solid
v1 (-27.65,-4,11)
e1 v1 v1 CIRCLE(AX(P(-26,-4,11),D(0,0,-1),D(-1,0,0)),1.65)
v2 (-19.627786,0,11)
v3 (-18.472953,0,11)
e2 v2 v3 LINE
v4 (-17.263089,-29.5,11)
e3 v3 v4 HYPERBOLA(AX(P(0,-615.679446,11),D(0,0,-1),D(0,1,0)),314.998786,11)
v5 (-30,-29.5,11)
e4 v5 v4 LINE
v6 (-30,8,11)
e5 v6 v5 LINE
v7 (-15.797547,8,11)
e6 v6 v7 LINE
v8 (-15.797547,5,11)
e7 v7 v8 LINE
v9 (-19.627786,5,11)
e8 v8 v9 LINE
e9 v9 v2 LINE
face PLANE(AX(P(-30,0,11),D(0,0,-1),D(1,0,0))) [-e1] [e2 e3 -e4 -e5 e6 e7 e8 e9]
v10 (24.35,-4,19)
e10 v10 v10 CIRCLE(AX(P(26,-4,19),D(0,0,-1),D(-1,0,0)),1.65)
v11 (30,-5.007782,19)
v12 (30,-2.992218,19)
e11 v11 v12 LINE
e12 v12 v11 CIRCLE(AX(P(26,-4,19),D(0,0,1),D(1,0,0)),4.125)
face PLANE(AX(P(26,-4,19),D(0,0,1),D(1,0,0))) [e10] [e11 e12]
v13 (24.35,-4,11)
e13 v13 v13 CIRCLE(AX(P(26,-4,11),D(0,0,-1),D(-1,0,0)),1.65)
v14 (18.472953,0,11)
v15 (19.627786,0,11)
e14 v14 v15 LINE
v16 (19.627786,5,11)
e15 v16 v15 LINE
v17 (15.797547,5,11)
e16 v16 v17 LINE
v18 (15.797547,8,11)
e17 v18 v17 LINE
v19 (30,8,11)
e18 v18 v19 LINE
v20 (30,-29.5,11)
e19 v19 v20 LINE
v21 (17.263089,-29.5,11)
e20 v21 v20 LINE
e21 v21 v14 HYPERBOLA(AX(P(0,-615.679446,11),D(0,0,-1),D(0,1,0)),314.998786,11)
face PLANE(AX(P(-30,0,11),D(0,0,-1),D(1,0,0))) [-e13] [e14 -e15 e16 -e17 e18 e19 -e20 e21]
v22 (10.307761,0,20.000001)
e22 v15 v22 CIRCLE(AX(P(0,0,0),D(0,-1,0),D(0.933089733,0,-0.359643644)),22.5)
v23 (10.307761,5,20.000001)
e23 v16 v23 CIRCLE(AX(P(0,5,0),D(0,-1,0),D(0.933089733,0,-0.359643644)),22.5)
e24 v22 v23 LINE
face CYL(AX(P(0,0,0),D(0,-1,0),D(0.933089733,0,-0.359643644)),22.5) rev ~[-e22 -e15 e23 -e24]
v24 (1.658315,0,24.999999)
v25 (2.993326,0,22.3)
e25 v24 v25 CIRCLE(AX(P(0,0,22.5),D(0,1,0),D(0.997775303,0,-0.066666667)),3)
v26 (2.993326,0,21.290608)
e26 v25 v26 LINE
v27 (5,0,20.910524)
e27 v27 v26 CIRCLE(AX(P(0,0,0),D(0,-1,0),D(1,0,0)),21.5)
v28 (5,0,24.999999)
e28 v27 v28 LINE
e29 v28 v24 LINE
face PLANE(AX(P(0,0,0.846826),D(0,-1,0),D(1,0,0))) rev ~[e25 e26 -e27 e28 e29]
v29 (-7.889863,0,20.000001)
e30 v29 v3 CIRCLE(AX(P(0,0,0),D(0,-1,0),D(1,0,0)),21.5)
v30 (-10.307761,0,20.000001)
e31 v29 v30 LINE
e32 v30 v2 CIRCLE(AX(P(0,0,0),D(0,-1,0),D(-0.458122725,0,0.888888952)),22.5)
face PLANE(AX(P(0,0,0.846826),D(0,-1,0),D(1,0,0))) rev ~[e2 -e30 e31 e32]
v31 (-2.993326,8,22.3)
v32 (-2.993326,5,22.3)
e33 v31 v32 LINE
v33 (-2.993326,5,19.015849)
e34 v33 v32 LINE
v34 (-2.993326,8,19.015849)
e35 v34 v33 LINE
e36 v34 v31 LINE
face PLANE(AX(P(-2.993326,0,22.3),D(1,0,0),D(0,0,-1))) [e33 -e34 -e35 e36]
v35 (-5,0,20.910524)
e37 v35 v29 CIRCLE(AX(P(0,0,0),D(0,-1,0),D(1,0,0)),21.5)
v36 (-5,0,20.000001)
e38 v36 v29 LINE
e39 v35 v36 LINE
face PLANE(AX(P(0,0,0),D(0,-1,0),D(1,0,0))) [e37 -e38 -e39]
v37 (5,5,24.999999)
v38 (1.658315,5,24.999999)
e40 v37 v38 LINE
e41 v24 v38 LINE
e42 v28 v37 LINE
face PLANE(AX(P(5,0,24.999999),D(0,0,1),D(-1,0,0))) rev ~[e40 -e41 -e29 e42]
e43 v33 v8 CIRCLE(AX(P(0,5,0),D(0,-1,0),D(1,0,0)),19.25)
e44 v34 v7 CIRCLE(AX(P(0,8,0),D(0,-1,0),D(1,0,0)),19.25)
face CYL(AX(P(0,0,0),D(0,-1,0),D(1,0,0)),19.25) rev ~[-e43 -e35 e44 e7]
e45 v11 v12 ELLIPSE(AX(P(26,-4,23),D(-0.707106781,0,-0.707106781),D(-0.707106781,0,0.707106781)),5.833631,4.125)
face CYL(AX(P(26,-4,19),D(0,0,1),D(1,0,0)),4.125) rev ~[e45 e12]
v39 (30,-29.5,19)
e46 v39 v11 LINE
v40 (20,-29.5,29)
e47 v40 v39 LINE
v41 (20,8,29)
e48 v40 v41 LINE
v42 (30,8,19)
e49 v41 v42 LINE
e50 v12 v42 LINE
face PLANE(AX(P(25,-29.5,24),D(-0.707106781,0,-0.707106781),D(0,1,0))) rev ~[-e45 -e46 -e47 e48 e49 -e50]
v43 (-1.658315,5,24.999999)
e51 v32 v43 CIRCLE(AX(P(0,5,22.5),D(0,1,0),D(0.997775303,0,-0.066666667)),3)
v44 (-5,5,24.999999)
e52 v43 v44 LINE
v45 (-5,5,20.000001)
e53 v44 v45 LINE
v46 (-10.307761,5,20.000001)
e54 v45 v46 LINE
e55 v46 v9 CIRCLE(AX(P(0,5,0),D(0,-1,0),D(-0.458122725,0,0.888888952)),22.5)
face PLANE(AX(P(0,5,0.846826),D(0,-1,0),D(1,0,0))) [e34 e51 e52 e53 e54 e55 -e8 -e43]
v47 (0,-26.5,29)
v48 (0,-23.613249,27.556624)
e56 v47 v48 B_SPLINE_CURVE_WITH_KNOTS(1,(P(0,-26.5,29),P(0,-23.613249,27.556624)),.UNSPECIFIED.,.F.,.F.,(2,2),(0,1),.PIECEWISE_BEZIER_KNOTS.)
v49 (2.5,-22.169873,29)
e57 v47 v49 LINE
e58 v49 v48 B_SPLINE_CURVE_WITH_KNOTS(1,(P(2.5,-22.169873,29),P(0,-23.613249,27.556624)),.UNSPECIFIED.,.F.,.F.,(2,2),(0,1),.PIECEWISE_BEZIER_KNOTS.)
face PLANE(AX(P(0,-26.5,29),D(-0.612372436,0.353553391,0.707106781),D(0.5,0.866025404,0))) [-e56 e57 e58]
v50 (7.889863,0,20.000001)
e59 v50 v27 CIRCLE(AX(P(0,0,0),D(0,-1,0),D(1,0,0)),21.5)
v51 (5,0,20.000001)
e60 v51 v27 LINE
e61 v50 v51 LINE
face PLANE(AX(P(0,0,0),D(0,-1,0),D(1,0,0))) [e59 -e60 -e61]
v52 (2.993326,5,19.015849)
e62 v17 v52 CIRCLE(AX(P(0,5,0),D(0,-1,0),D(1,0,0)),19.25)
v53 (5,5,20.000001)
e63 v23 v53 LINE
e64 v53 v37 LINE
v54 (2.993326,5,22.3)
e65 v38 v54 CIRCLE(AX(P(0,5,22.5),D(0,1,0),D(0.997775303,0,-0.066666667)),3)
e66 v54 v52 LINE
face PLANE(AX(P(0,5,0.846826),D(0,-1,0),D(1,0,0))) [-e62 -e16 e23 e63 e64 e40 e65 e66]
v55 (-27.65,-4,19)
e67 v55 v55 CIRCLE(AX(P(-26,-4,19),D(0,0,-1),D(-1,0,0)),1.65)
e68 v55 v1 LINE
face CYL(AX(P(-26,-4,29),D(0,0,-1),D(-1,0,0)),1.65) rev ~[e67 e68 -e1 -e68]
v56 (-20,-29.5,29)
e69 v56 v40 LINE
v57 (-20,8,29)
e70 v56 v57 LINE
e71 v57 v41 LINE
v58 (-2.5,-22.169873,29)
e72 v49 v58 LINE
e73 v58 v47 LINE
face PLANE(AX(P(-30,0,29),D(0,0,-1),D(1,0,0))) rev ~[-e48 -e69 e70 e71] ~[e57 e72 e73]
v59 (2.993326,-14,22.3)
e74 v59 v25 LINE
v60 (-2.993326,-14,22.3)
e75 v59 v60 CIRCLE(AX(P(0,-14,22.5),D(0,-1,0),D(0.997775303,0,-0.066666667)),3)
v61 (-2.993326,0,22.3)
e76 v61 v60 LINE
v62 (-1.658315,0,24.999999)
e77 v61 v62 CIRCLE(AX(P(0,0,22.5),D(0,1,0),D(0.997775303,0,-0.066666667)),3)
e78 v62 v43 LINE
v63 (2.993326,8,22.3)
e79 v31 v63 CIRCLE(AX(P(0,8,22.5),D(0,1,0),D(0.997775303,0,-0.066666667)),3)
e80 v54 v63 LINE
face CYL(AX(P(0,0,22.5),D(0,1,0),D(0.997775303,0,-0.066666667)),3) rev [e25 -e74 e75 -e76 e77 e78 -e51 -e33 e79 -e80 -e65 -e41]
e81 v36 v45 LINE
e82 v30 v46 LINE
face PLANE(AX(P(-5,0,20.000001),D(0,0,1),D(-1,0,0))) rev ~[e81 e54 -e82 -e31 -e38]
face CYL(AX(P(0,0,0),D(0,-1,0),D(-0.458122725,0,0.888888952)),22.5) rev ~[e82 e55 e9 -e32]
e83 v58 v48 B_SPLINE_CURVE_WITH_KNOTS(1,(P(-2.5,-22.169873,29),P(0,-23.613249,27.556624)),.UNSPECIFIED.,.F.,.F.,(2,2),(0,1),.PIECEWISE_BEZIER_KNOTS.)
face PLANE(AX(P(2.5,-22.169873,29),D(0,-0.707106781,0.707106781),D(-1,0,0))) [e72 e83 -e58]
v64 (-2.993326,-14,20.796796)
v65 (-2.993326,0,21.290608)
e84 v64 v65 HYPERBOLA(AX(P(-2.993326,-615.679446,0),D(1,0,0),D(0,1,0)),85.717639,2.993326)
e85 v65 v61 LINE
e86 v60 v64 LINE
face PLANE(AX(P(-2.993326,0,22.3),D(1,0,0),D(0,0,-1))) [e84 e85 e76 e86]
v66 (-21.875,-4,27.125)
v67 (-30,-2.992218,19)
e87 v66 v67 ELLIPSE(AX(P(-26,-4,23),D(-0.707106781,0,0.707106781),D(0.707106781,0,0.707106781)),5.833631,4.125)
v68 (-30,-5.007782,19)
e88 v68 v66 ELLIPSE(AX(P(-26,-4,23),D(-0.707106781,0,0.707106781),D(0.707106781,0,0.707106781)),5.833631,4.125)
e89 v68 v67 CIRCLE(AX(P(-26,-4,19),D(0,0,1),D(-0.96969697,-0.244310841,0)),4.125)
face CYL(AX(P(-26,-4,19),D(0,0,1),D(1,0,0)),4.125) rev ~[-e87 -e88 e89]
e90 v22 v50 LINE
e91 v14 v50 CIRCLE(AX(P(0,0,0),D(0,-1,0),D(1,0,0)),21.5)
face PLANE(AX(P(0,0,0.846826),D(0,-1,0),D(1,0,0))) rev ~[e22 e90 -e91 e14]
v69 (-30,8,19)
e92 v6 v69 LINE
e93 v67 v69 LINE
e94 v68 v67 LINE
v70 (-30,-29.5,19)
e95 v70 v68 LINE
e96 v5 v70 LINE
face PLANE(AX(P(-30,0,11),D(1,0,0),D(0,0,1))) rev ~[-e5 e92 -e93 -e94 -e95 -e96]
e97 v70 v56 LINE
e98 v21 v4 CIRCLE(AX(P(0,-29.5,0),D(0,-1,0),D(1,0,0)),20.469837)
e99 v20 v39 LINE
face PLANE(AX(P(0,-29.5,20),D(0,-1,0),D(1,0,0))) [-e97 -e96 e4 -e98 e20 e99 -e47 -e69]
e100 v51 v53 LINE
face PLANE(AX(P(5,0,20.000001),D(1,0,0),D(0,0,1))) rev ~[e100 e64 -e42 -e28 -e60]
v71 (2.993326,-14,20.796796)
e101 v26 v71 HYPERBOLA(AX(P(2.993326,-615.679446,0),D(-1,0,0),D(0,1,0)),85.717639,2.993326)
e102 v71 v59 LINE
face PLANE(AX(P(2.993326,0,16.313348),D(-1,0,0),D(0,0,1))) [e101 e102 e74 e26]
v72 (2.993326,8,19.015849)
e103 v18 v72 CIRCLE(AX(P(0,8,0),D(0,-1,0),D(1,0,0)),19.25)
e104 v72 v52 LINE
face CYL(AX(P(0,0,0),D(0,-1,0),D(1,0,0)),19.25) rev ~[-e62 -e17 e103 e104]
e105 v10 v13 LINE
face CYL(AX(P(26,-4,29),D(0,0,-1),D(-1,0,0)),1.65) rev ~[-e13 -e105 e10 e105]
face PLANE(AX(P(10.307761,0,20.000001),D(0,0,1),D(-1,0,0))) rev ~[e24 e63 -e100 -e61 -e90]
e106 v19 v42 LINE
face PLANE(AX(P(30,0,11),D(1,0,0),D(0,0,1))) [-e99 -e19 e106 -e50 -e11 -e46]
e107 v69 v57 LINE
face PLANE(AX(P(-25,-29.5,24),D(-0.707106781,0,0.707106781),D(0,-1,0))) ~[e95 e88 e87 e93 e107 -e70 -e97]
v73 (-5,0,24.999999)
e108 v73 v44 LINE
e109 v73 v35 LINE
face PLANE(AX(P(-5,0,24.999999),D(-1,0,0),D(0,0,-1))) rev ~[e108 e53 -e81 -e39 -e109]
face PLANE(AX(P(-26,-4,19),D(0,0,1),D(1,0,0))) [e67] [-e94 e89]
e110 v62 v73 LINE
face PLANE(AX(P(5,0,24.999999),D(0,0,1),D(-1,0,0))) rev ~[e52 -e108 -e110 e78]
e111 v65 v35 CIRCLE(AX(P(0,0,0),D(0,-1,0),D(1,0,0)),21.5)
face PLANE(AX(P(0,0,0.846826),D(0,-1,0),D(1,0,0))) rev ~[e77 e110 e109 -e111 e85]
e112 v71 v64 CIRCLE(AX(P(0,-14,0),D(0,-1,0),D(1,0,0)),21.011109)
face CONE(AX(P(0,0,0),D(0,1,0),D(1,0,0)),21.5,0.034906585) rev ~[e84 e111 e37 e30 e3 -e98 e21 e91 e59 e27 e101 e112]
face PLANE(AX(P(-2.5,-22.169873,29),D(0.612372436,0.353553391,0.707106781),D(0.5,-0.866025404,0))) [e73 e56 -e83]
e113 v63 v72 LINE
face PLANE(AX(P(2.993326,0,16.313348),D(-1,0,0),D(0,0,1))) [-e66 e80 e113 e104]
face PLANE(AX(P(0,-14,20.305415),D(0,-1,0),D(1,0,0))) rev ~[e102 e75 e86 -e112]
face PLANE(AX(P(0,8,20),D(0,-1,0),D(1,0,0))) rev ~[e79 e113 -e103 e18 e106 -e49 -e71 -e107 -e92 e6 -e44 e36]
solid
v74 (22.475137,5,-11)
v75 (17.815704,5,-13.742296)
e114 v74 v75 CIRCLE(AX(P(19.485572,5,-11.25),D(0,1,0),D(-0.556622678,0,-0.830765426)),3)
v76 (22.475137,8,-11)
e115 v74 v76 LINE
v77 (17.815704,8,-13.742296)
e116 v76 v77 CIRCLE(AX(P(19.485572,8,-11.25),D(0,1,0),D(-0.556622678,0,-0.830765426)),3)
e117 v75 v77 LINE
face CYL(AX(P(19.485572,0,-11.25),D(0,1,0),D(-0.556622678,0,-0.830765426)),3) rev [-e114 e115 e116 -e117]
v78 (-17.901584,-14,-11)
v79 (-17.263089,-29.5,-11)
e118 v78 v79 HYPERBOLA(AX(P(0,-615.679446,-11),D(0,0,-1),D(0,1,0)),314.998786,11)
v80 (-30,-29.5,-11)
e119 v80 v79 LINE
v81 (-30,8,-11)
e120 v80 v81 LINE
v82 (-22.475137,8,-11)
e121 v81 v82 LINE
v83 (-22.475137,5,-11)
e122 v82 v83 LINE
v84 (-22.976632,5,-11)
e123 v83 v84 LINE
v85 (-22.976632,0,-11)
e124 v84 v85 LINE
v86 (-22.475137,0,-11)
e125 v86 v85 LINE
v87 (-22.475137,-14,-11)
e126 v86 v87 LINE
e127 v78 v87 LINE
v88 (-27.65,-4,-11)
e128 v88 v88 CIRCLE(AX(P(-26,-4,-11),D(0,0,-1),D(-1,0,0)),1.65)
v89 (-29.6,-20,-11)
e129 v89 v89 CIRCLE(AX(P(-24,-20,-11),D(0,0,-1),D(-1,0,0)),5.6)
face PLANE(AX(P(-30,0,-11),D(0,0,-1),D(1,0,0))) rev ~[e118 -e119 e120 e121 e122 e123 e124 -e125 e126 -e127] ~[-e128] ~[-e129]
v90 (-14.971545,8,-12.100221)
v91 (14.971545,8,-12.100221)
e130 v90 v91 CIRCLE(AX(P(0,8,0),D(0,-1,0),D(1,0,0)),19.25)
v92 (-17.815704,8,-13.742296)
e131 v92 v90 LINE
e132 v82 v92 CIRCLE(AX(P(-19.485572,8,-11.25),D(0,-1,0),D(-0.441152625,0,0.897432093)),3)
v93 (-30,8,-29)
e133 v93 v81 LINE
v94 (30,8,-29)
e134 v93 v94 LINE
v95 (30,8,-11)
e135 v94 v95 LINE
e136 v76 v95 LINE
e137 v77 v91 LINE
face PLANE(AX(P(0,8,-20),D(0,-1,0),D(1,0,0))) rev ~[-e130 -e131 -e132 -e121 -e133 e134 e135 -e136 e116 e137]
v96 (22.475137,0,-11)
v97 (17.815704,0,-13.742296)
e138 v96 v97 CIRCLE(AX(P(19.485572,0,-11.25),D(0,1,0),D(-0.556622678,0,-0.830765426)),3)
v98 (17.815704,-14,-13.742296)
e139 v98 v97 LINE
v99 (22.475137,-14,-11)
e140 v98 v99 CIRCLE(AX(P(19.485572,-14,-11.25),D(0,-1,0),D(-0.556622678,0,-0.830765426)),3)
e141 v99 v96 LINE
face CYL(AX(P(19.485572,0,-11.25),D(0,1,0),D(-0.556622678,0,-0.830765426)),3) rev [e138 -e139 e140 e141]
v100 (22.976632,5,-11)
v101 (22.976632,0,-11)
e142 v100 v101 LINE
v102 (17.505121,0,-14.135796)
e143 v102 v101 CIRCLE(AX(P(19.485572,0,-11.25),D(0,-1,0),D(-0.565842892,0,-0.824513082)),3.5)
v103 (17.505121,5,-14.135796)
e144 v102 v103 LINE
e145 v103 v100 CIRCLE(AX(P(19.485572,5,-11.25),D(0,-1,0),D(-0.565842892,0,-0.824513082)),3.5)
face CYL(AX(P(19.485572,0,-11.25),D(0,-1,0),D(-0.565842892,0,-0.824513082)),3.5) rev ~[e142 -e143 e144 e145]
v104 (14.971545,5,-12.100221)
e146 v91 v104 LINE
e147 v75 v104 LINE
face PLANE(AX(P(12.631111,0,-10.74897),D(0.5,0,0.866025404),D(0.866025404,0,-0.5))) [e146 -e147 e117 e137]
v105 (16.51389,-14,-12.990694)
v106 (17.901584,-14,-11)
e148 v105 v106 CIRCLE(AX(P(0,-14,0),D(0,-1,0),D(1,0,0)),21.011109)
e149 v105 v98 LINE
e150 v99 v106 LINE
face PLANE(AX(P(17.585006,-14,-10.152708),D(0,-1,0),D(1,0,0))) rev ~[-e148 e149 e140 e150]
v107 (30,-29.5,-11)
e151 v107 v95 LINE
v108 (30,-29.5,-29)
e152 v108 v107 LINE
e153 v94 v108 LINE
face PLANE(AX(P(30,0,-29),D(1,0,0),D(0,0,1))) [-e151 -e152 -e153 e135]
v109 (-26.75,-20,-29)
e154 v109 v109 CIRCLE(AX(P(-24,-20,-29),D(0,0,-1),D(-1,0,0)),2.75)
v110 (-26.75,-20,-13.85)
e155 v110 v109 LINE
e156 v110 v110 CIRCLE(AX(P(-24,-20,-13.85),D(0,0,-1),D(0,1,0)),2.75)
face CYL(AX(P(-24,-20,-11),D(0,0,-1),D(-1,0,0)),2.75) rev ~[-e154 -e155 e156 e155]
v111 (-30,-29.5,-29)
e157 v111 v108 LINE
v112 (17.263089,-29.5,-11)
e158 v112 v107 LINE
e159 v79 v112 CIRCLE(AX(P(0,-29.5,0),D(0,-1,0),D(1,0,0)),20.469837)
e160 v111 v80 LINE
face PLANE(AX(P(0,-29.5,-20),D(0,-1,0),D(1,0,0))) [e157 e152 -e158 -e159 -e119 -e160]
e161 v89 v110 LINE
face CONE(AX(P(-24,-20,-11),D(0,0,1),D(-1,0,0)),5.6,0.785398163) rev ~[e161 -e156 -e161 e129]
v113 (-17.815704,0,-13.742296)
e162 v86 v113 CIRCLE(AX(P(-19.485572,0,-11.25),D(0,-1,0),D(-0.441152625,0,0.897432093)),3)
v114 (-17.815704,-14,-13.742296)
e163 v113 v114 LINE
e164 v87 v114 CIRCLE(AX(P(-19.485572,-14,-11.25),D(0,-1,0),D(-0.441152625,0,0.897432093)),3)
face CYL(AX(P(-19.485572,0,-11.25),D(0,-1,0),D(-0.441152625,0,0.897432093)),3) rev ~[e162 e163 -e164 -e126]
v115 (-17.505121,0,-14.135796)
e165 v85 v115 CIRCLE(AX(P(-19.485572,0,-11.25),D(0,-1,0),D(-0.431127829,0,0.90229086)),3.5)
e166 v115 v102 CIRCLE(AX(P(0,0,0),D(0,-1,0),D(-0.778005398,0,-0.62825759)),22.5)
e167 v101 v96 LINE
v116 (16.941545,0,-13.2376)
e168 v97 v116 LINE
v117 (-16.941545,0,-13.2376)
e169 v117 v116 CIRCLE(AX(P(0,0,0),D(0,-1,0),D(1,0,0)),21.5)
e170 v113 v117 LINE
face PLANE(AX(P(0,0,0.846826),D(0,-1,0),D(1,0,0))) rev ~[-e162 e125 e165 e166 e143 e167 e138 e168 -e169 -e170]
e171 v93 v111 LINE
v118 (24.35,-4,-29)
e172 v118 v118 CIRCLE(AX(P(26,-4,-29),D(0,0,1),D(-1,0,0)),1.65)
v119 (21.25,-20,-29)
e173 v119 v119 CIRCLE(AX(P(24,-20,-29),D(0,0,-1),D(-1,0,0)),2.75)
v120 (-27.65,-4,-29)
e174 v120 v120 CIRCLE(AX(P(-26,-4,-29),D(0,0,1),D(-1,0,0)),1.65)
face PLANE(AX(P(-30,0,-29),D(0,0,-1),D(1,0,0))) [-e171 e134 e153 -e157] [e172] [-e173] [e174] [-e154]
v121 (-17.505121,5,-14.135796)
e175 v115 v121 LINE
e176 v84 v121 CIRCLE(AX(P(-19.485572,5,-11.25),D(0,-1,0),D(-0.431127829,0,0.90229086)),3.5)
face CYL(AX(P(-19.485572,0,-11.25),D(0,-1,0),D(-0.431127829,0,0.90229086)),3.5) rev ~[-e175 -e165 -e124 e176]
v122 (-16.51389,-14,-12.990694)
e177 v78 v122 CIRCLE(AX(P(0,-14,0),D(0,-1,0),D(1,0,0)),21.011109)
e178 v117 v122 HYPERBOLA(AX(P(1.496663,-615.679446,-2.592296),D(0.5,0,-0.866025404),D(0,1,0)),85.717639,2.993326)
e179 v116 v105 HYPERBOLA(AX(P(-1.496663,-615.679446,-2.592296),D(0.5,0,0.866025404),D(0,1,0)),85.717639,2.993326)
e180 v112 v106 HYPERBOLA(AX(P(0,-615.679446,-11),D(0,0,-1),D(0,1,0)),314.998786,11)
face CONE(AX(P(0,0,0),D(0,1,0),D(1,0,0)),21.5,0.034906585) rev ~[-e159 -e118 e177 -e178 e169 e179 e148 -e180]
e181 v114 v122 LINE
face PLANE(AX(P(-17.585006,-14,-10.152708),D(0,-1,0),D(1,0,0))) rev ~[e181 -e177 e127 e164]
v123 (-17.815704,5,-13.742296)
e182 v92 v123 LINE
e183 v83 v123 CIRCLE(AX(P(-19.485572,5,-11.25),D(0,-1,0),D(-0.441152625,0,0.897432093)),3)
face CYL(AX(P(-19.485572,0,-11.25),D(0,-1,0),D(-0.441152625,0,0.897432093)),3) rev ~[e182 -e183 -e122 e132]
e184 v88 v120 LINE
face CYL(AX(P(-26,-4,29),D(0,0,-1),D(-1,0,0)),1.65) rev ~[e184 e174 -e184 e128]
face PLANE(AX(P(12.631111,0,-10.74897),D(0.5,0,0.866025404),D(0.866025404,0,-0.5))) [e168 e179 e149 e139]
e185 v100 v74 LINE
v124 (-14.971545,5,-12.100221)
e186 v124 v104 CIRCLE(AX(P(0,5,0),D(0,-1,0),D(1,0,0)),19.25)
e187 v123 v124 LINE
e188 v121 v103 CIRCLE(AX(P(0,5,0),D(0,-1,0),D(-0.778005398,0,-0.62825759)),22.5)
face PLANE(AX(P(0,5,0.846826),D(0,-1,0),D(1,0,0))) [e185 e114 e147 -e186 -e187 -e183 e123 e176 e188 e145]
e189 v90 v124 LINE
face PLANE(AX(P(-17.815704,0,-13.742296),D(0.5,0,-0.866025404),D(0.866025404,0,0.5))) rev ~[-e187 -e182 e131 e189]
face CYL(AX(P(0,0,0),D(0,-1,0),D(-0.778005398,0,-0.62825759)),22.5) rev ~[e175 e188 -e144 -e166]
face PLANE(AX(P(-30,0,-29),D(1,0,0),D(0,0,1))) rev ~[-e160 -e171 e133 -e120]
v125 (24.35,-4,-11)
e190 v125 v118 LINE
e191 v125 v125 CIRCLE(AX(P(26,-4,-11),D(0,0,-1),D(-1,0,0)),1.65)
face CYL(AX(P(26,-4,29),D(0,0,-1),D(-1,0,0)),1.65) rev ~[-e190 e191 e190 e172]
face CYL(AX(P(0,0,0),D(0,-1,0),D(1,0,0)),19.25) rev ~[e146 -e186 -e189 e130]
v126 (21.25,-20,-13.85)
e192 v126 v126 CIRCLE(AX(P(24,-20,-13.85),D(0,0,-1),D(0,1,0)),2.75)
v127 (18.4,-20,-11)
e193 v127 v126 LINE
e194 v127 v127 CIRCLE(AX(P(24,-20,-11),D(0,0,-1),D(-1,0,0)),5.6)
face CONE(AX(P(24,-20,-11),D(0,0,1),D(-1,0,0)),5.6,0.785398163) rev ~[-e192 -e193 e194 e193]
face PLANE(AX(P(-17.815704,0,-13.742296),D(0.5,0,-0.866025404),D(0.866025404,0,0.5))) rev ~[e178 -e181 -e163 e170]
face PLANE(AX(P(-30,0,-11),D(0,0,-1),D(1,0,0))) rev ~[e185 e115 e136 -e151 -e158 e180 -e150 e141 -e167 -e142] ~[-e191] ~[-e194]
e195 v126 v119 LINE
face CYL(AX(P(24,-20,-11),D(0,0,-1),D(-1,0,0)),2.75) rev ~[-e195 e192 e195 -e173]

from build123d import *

# Parameters (mm, degrees)
F1_W              = 60
F1_H              = 18
F2_DEPTH          = 29.5
F2_DEPTH_BACK     = 8
F3_DEPTH          = 5
F4_R              = 19.25
F5_DEPTH          = 25
F6_R              = 21.5
F7_DEPTH          = 30
F7_TAPER          = 2
F9_DEPTH          = 14
F12_SIZE          = 10
F14_D             = 5.5
F14_DEPTH         = 40
F14_CSINK_D       = 11.2
F14_CSINK_ANGLE   = 90
F14_TIP           = 1.6523667023
F16_D             = 3.3
F16_DEPTH         = 58
F16_CBORE_D       = 8.25
F16_CBORE_DEPTH   = 10
F16_TIP           = 0.9914200214
F16_2_D           = 3.3
F16_2_DEPTH       = 58
F16_2_CBORE_D     = 8.25
F16_2_CBORE_DEPTH = 10
F16_2_TIP         = 0.9914200214


# Not quite as in the source:
# - an extrude whose draft closes it to a point is written as a loft to that point


with BuildPart() as f2:
    # F1 (on Front) → F2 (new body, two sides)
    with BuildSketch(Plane.XZ) as f2_sk:
        with Locations((0, -20)):
            Rectangle(F1_W, F1_H)
    extrude(amount=F2_DEPTH)
    extrude(f2_sk.sketch, amount=-F2_DEPTH_BACK)


with BuildPart() as f2b:
    # F1 (on Front) → F2, piece 2 (new body, two sides)
    with BuildSketch(Plane.XZ) as f2_2_sk:
        with Locations((0, 20)):
            Rectangle(F1_W, F1_H)
    extrude(amount=F2_DEPTH)
    extrude(f2_2_sk.sketch, amount=-F2_DEPTH_BACK)


with BuildPart() as f3_tool:
    # F0 (on Front) → F3 (new body)
    with BuildSketch(Plane.XZ):
        with BuildLine():
            Line((-5, 20.0000014156), (-10.3077613174, 20.0000014156))
            ThreePointArc((-10.3077613174, 20.0000014156), (-21.0296949807, 8.0001205627), (-20.9945189859, -8.0919819915))
            ThreePointArc((-20.9945189859, -8.0919819915), (-22.5166604984, -13), (-17.5051214646, -14.1357957862))
            ThreePointArc((-17.5051214646, -14.1357957862), (0, -22.5), (17.5051214646, -14.1357957862))
            ThreePointArc((17.5051214646, -14.1357957862), (22.5166604984, -13), (20.9945189859, -8.0919819915))
            ThreePointArc((20.9945189859, -8.0919819915), (21.0296949807, 8.0001205627), (10.3077613174, 20.0000014156))
            Line((10.3077613174, 20.0000014156), (5, 20.0000014156))
            Line((5, 20.0000014156), (5, 24.9999985844))
            Line((5, 24.9999985844), (-5, 24.9999985844))
            Line((-5, 24.9999985844), (-5, 20.0000014156))
        make_face()
    extrude(amount=-F3_DEPTH)


with BuildPart() as f2_1:
    add(f2.part)

    # F3: cut by f3_tool
    add(f3_tool.part, mode=Mode.SUBTRACT)


with BuildPart() as f2b_1:
    add(f2b.part)

    # F3: cut by f3_tool
    add(f3_tool.part, mode=Mode.SUBTRACT)


with BuildPart() as f5_tool:
    # F4 (on Front) → F5 (new body)
    with BuildSketch(Plane.XZ):
        Circle(F4_R)
    extrude(amount=-F5_DEPTH)


with BuildPart() as f2_2:
    add(f2_1.part)

    # F5: cut by f5_tool
    add(f5_tool.part, mode=Mode.SUBTRACT)


with BuildPart() as f2b_2:
    add(f2b_1.part)

    # F5: cut by f5_tool
    add(f5_tool.part, mode=Mode.SUBTRACT)


with BuildPart() as f7_tool:
    # F6 (on Front) → F7 (new body)
    with BuildSketch(Plane.XZ):
        Circle(F6_R)
    extrude(amount=F7_DEPTH, taper=F7_TAPER)


with BuildPart() as f2_3:
    add(f2_2.part)

    # F7: cut by f7_tool
    add(f7_tool.part, mode=Mode.SUBTRACT)


with BuildPart() as f2b_3:
    add(f2b_2.part)

    # F7: cut by f7_tool
    add(f7_tool.part, mode=Mode.SUBTRACT)


with BuildPart() as f9_tool:
    # F8 (on Front) → F9 (new body, symmetric)
    with BuildSketch(Plane.XZ):
        with BuildLine():
            ThreePointArc((2.9933259094, 22.3), (0, 25.5), (-2.9933259094, 22.3))
            Line((-2.9933259094, 22.3), (-2.9933259094, 16.3133481812))
            Line((-2.9933259094, 16.3133481812), (2.9933259094, 16.3133481812))
            Line((2.9933259094, 16.3133481812), (2.9933259094, 22.3))
        make_face()
        with BuildLine():
            ThreePointArc((17.8157035497, -13.7422962794), (22.0836477965, -12.75), (20.8090294591, -8.5577037206))
            Line((20.8090294591, -8.5577037206), (15.6244369004, -5.5643778112))
            Line((15.6244369004, -5.5643778112), (12.631110991, -10.7489703699))
            Line((12.631110991, -10.7489703699), (17.8157035497, -13.7422962794))
        make_face()
        with BuildLine():
            ThreePointArc((-20.8090294591, -8.5577037206), (-22.0836477965, -12.75), (-17.8157035497, -13.7422962794))
            Line((-17.8157035497, -13.7422962794), (-12.631110991, -10.7489703699))
            Line((-12.631110991, -10.7489703699), (-15.6244369004, -5.5643778112))
            Line((-15.6244369004, -5.5643778112), (-20.8090294591, -8.5577037206))
        make_face()
    extrude(amount=F9_DEPTH, both=True)


with BuildPart() as f2_4:
    add(f2_3.part)

    # F9: cut by f9_tool
    add(f9_tool.part, mode=Mode.SUBTRACT)

    # F14
    with Locations(Plane.XY.offset(-11)):
        with Locations((-24, -20), (24, -20)):
            CounterSinkHole(F14_D / 2, F14_CSINK_D / 2, depth=F14_DEPTH, counter_sink_angle=F14_CSINK_ANGLE)
            with Locations((0, 0, -(F14_DEPTH + F14_TIP / 2))):  # 118° drill point
                Cone(0, F14_D / 2, F14_TIP, mode=Mode.SUBTRACT)

    # F16
    with Locations(Plane.XY.offset(29)):
        with Locations((-26, -4), (26, -4)):
            CounterBoreHole(F16_D / 2, F16_CBORE_D / 2, F16_CBORE_DEPTH, depth=F16_DEPTH)
            with Locations((0, 0, -(F16_DEPTH + F16_TIP / 2))):  # 118° drill point
                Cone(0, F16_D / 2, F16_TIP, mode=Mode.SUBTRACT)


with BuildPart() as f2b_4:
    add(f2b_3.part)

    # F9: cut by f9_tool
    add(f9_tool.part, mode=Mode.SUBTRACT)

    # F10 (on face) → F11 section 0
    with BuildSketch(Plane.XY.offset(29), mode=Mode.PRIVATE) as f11_s0:
        Polygon((-2.5, -22.1698729811), (0, -26.5), (2.5, -22.1698729811), align=None)
    loft([f11_s0.sketch, Vertex(0, -23.6132486541, 27.556624327)], ruled=True, mode=Mode.SUBTRACT)

    # F12
    f12_edges = [f2b_4.edges().sort_by_distance(p)[0] for p in [
        (30, -10.75, 29),
        (-30, -10.75, 29),
    ]]
    chamfer(f12_edges, length=F12_SIZE)

    # F16#2
    with Locations(Plane.XY.offset(29)):
        with Locations((-26, -4), (26, -4)):
            CounterBoreHole(F16_2_D / 2, F16_2_CBORE_D / 2, F16_2_CBORE_DEPTH, depth=F16_2_DEPTH)
            with Locations((0, 0, -(F16_2_DEPTH + F16_2_TIP / 2))):  # 118° drill point
                Cone(0, F16_2_D / 2, F16_2_TIP, mode=Mode.SUBTRACT)


solid = Compound([f2_4.part, f2b_4.part])
